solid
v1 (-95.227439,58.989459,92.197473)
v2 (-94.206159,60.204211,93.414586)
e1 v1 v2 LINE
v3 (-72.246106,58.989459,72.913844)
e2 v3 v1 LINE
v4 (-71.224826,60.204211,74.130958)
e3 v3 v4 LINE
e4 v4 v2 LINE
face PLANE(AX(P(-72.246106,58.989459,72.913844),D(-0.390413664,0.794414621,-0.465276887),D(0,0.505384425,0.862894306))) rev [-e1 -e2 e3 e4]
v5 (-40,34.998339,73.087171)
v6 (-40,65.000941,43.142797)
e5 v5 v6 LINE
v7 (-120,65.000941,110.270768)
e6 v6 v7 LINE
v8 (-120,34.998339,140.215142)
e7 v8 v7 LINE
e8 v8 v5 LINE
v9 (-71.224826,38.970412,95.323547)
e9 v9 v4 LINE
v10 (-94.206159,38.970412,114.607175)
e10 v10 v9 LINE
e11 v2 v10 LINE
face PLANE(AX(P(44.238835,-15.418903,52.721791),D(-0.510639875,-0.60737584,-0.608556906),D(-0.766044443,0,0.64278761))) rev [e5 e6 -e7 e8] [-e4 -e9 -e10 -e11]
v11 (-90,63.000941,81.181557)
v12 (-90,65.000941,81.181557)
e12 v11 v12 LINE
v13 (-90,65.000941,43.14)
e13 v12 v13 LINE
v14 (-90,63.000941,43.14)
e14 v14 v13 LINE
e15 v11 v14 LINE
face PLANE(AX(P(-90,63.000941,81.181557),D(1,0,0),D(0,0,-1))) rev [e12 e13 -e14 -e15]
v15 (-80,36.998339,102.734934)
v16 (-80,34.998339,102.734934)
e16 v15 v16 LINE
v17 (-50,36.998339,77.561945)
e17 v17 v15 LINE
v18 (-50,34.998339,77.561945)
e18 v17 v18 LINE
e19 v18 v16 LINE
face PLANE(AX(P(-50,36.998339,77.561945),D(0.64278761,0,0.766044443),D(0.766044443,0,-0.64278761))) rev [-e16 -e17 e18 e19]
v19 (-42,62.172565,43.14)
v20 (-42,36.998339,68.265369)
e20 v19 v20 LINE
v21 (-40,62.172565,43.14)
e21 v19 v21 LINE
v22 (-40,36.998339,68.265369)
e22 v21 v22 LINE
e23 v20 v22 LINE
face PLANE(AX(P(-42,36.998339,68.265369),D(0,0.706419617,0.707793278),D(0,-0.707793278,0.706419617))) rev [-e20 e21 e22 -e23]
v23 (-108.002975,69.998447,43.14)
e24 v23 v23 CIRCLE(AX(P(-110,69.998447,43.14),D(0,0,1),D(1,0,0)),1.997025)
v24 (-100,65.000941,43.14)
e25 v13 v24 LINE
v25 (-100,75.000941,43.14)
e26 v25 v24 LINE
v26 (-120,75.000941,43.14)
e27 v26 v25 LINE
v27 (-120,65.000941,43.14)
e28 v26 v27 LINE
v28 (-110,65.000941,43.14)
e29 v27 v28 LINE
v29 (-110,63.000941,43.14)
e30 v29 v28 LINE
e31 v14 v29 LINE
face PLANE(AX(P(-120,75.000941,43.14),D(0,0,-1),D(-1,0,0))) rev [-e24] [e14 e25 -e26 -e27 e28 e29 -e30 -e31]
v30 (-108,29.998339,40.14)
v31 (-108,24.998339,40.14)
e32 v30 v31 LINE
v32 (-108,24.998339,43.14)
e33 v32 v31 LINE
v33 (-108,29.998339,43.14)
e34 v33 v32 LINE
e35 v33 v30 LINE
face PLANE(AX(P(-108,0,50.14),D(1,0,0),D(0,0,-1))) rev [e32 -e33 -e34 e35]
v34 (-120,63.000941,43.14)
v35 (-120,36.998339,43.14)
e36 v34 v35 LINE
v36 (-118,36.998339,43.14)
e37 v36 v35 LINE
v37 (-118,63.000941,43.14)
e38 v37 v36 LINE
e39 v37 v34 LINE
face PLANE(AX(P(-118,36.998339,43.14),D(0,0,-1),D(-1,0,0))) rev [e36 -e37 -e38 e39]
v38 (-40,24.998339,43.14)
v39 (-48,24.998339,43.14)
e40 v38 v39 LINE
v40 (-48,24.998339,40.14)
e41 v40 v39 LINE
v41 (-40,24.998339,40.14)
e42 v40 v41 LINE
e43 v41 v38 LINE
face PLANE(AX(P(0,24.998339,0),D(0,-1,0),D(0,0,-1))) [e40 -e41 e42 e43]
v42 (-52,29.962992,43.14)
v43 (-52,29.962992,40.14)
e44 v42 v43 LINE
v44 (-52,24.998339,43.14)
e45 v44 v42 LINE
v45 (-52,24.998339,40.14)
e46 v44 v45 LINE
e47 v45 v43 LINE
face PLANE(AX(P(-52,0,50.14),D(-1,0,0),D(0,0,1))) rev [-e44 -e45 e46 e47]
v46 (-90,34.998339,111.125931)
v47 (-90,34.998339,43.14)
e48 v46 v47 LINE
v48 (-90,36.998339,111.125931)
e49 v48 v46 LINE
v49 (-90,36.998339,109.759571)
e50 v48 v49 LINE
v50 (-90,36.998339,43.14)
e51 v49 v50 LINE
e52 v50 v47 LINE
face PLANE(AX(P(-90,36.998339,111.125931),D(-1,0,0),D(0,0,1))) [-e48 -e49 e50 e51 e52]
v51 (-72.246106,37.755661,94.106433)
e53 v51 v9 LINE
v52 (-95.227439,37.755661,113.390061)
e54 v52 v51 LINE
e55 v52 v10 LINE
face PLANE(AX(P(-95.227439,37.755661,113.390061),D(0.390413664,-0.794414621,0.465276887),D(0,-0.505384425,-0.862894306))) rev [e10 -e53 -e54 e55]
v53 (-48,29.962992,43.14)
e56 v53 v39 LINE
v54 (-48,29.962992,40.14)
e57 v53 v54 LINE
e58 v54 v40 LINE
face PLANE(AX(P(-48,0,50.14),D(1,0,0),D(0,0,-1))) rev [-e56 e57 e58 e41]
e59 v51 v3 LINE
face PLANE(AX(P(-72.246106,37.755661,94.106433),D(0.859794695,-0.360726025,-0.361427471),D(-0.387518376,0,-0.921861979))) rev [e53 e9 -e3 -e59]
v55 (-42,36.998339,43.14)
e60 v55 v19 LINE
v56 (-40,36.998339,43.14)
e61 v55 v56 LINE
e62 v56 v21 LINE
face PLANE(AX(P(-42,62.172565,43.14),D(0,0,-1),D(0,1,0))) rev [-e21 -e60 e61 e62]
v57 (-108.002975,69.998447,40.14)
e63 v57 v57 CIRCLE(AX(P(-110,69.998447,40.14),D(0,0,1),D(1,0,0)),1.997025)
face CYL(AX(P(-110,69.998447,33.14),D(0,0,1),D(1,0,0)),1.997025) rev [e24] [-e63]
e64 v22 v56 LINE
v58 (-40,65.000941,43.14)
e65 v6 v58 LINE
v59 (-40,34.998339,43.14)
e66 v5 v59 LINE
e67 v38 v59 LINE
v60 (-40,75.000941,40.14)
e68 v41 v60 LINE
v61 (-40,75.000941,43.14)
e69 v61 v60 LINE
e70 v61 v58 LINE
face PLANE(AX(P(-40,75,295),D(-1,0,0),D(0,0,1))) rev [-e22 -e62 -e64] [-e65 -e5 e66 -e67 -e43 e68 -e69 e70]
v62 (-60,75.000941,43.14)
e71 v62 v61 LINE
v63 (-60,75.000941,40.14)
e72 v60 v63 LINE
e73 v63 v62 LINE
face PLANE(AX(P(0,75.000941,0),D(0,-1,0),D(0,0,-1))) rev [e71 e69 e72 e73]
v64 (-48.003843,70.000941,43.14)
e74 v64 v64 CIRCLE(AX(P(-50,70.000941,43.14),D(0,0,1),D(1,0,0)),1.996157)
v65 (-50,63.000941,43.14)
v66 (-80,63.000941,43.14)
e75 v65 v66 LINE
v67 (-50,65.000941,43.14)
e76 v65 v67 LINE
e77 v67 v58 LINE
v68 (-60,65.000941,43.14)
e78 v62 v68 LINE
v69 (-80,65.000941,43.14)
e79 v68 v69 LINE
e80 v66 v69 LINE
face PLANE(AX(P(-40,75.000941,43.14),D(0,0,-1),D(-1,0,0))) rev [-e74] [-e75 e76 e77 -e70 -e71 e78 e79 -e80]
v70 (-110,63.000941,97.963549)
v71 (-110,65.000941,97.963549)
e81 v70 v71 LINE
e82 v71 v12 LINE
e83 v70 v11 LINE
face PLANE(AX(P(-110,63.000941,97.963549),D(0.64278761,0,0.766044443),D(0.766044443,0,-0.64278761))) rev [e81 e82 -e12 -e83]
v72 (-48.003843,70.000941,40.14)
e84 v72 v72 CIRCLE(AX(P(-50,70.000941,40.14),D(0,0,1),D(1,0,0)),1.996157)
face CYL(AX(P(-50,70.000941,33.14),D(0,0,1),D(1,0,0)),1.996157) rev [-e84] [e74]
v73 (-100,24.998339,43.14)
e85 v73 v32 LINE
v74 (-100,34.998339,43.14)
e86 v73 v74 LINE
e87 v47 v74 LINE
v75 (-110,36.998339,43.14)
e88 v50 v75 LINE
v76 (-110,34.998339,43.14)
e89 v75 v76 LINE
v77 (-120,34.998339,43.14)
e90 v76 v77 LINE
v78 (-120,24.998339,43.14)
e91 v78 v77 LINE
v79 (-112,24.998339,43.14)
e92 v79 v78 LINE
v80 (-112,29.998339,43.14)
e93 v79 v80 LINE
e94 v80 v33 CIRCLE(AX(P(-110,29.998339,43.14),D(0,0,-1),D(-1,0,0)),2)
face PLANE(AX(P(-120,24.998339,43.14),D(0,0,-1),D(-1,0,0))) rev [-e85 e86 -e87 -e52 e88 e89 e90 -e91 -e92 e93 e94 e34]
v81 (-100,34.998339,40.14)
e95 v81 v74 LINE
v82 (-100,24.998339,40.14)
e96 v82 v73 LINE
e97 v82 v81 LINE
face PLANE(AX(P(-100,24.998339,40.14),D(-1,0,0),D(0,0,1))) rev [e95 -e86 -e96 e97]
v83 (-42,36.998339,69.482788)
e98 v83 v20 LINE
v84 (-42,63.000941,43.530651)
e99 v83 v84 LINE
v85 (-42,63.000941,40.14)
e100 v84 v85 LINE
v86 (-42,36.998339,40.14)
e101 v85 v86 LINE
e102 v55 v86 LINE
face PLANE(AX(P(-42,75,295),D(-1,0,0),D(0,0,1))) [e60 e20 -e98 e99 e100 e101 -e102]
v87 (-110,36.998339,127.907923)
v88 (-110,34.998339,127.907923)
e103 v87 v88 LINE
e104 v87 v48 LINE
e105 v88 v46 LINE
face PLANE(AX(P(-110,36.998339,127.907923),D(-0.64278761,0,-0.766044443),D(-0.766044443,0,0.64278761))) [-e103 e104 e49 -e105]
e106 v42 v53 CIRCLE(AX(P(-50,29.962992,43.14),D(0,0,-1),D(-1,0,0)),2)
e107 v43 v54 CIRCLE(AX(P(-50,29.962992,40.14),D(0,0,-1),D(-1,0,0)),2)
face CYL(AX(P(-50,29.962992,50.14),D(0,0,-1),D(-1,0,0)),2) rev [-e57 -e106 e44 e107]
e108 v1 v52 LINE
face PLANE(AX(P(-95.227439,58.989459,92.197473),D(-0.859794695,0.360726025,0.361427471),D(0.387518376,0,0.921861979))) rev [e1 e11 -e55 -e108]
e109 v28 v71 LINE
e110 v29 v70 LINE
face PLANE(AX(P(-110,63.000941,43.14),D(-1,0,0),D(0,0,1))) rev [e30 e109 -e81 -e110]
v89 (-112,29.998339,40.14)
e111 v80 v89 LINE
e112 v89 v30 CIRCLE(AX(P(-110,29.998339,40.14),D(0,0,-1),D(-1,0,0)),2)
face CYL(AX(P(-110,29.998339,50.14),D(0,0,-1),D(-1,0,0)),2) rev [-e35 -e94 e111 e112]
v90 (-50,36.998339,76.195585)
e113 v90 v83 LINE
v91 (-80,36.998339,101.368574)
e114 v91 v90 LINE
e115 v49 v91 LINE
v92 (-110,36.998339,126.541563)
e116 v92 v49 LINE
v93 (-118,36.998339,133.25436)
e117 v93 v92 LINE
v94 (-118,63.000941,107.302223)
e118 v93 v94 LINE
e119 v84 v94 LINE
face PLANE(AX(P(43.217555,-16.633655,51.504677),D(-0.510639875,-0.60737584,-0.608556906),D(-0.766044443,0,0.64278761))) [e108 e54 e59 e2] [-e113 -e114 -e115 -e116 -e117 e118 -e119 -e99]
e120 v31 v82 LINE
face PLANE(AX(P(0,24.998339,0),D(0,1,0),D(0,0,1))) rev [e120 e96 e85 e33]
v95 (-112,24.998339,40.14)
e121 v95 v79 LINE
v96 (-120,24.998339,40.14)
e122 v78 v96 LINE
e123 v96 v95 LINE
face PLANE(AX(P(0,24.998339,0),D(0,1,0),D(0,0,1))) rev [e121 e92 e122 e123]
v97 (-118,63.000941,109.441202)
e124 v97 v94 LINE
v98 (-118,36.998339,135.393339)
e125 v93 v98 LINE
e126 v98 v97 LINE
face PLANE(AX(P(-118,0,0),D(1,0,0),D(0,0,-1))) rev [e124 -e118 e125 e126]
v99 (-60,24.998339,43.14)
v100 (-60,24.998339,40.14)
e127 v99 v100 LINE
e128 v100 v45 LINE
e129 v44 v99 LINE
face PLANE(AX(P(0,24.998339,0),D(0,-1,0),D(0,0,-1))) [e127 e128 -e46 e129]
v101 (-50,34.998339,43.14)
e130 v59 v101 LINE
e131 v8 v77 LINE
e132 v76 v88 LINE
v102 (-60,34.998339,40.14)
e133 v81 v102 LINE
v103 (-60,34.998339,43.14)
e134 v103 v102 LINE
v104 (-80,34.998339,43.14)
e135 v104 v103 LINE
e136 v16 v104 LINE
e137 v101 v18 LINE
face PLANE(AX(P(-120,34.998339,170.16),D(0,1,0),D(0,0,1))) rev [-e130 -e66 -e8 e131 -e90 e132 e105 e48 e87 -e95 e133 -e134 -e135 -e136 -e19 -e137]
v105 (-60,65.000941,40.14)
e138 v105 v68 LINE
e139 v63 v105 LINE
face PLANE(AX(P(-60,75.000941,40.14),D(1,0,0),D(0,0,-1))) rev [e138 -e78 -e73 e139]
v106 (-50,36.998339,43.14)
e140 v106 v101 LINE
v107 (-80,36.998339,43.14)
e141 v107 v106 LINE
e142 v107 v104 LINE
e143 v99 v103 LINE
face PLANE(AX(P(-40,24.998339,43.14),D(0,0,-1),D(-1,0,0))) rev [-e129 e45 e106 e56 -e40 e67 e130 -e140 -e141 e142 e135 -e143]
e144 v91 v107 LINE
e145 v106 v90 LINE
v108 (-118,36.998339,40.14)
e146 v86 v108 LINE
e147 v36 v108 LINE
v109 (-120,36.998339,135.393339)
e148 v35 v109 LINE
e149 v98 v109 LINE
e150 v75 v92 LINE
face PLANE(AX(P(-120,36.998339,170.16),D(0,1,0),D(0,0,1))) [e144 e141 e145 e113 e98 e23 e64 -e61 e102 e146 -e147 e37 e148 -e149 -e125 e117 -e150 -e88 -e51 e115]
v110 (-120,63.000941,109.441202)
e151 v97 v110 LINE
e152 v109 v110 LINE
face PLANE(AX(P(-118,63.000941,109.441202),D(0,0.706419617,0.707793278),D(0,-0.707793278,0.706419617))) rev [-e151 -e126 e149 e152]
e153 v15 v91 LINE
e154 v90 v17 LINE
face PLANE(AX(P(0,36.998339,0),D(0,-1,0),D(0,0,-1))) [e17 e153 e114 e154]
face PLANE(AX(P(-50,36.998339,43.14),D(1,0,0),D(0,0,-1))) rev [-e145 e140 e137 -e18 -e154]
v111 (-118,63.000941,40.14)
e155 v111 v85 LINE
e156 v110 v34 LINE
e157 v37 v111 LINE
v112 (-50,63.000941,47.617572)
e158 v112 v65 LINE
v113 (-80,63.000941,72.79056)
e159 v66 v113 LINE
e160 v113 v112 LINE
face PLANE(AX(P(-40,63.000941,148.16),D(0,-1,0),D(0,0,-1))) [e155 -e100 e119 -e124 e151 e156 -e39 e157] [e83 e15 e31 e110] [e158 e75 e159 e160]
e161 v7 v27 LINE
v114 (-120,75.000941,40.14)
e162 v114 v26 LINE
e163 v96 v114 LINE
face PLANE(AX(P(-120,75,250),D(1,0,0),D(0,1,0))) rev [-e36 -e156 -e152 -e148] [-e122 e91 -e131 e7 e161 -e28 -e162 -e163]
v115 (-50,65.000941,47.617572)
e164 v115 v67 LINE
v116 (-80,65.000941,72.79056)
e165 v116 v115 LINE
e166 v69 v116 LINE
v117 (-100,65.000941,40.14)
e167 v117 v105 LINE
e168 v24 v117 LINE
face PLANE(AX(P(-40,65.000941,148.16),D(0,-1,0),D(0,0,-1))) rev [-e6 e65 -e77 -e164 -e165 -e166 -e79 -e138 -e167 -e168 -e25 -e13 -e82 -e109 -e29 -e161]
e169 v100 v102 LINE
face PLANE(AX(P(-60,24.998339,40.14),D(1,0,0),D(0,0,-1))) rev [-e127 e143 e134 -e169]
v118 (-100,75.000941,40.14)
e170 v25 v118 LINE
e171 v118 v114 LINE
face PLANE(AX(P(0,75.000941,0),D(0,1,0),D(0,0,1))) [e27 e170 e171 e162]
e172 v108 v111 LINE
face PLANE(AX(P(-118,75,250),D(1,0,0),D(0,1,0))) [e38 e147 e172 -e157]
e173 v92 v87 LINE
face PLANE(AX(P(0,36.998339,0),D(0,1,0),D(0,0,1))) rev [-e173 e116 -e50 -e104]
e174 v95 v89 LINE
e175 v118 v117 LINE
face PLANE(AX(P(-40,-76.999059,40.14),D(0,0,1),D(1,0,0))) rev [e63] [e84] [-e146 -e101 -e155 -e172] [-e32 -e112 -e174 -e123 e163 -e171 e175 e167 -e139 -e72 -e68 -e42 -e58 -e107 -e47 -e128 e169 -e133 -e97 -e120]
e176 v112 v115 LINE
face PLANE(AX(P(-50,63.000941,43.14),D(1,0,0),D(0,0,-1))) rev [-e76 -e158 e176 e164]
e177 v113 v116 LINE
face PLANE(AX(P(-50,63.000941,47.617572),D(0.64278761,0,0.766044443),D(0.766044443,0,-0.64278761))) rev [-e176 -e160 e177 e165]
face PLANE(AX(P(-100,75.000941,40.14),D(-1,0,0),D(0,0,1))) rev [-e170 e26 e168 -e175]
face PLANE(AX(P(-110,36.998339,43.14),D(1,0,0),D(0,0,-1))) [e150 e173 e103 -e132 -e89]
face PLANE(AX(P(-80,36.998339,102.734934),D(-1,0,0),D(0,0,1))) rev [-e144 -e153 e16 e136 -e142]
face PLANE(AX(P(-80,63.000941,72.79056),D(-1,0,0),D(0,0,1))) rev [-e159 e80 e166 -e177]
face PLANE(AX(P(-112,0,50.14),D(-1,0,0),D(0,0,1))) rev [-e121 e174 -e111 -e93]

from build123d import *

# Parameters (mm, degrees)
SKETCH_2_W           = 240
SKETCH_2_H           = 150
EXTRUDE_1_DEPTH      = 250
CUT_EXTRUDE_1_DEPTH  = 200
CUT_REVOLVE_1_ANGLE  = 37.4
SKETCH_13_W          = 80
SKETCH_13_H          = 100
CUT_EXTRUDE_2_DEPTH  = 295
SKETCH_14_W          = 160
SKETCH_14_H          = 150
CUT_EXTRUDE_3_DEPTH  = 295
SKETCH_16_W          = 80
SKETCH_16_H          = 28.16
CUT_EXTRUDE_4_DEPTH  = 295
SKETCH_22_W          = 80
SKETCH_22_H          = 9.999058643
CUT_EXTRUDE_5_DEPTH  = 120
SKETCH_23_W          = 80
SKETCH_23_H          = 9.99833939
CUT_EXTRUDE_6_DEPTH  = 142
SKETCH_24_W          = 80
SKETCH_24_H          = 11.98
CUT_EXTRUDE_7_DEPTH  = 142
SKETCH_25_W          = 20
SKETCH_25_H          = 3
EXTRUDE_2_DEPTH      = 10
SKETCH_26_W          = 20
SKETCH_26_H          = 3
EXTRUDE_3_DEPTH      = 10
SKETCH_27_W          = 20
SKETCH_27_H          = 3
EXTRUDE_4_DEPTH      = 10
SKETCH_28_W          = 20
SKETCH_28_H          = 3
EXTRUDE_5_DEPTH      = 10
SKETCH_29_R          = 1.997024656
CUT_EXTRUDE_8_DEPTH  = 10
SKETCH_30_R          = 1.996157305
CUT_EXTRUDE_9_DEPTH  = 10
CUT_EXTRUDE_10_DEPTH = 10
CUT_EXTRUDE_11_DEPTH = 10
SKETCH_34_W          = 76
SKETCH_34_H          = 26.002601967
CUT_EXTRUDE_14_DEPTH = 2
CUT_EXTRUDE_15_DEPTH = 2
CUT_EXTRUDE_17_DEPTH = 2
CUT_EXTRUDE_18_DEPTH = 2
CUT_EXTRUDE_20_DEPTH = 2
CUT_EXTRUDE_22_DEPTH = 2


with BuildPart() as part:
    # 草图2 → 凸台-拉伸1 (new body)
    with BuildSketch(Plane.XY):
        Rectangle(SKETCH_2_W, SKETCH_2_H)
    extrude(amount=EXTRUDE_1_DEPTH)

    # 草图9 → 切除-拉伸1 (cut)
    with BuildSketch(Plane(origin=(0, 75, 0), x_dir=(1, 0, 0), z_dir=(0, 1, 0))):
        Polygon((120, -250), (-120, -250), (208.236072982, 25.422767778), align=None)
    extrude(amount=-CUT_EXTRUDE_1_DEPTH, mode=Mode.SUBTRACT)

    # 草图10 → 切除-旋转1 (revolve, cut)
    with BuildSketch(Plane(origin=(73.519859787, 0, 87.617557028), x_dir=(0.7660444431189816, 0, -0.6427876096865353), z_dir=(0.6427876096865353, 0, 0.7660444431189817))):
        Polygon((60.675513844, -75), (-252.622235596, -75), (-252.622235596, 287.743692907), (60.675513844, 234.486341656), align=None)
    revolve(axis=Axis((120, -75, 48.616088517), (-0.7660444431189815, 0, 0.6427876096865353)), revolution_arc=CUT_REVOLVE_1_ANGLE, mode=Mode.SUBTRACT)

    # 草图13 → 切除-拉伸2 (cut)
    with BuildSketch(Plane(origin=(0, 0, 0), x_dir=(-1, 0, 0), z_dir=(0, 0, -1))):
        with Locations((80, -25)):
            Rectangle(SKETCH_13_W, SKETCH_13_H)
    extrude(amount=-CUT_EXTRUDE_2_DEPTH, mode=Mode.SUBTRACT)

    # 草图14 → 切除-拉伸3 (cut)
    with BuildSketch(Plane(origin=(0, 0, 0), x_dir=(-1, 0, 0), z_dir=(0, 0, -1))):
        with Locations((-40, 0)):
            Rectangle(SKETCH_14_W, SKETCH_14_H)
    extrude(amount=-CUT_EXTRUDE_3_DEPTH, mode=Mode.SUBTRACT)

    # 草图16 → 切除-拉伸4 (cut)
    with BuildSketch(Plane(origin=(0, 75, 0), x_dir=(1, 0, 0), z_dir=(0, 1, 0))):
        with Locations((-80, -14.08)):
            Rectangle(SKETCH_16_W, SKETCH_16_H)
    extrude(amount=-CUT_EXTRUDE_4_DEPTH, mode=Mode.SUBTRACT)

    # 草图22 → 切除-拉伸5 (cut)
    with BuildSketch(Plane(origin=(0, 0, 28.16), x_dir=(-1, 0, 0), z_dir=(0, 0, -1))):
        with Locations((80, 70.000470678)):
            Rectangle(SKETCH_22_W, SKETCH_22_H)
    extrude(amount=-CUT_EXTRUDE_5_DEPTH, mode=Mode.SUBTRACT)

    # 草图23 → 切除-拉伸6 (cut)
    with BuildSketch(Plane(origin=(0, 0, 28.16), x_dir=(-1, 0, 0), z_dir=(0, 0, -1))):
        with Locations((80, 29.999169695)):
            Rectangle(SKETCH_23_W, SKETCH_23_H)
    extrude(amount=-CUT_EXTRUDE_6_DEPTH, mode=Mode.SUBTRACT)

    # 草图24 → 切除-拉伸7 (cut)
    with BuildSketch(Plane(origin=(0, 65.000941357, 0), x_dir=(1, 0, 0), z_dir=(0, 1, 0))):
        with Locations((-80, -34.15)):
            Rectangle(SKETCH_24_W, SKETCH_24_H)
    extrude(amount=-CUT_EXTRUDE_7_DEPTH, mode=Mode.SUBTRACT)

    # 草图25 → 凸台-拉伸2 (add)
    with BuildSketch(Plane(origin=(0, 65.000941357, 0), x_dir=(1, 0, 0), z_dir=(0, 1, 0))):
        with Locations((-50, -41.64)):
            Rectangle(SKETCH_25_W, SKETCH_25_H)
    extrude(amount=EXTRUDE_2_DEPTH)

    # 草图26 → 凸台-拉伸3 (add)
    with BuildSketch(Plane(origin=(0, 65.000941357, 0), x_dir=(1, 0, 0), z_dir=(0, 1, 0))):
        with Locations((-110, -41.64)):
            Rectangle(SKETCH_26_W, SKETCH_26_H)
    extrude(amount=EXTRUDE_3_DEPTH)

    # 草图27 → 凸台-拉伸4 (add)
    with BuildSketch(Plane.XZ.offset(-34.99833939)):
        with Locations((-50, 41.64)):
            Rectangle(SKETCH_27_W, SKETCH_27_H)
    extrude(amount=EXTRUDE_4_DEPTH)

    # 草图28 → 凸台-拉伸5 (add)
    with BuildSketch(Plane.XZ.offset(-34.99833939)):
        with Locations((-110, 41.64)):
            Rectangle(SKETCH_28_W, SKETCH_28_H)
    extrude(amount=EXTRUDE_5_DEPTH)

    # 草图29 → 切除-拉伸8 (cut)
    with BuildSketch(Plane.XY.offset(43.14)):
        with Locations((-110, 69.998446832)):
            Circle(SKETCH_29_R)
    extrude(amount=-CUT_EXTRUDE_8_DEPTH, mode=Mode.SUBTRACT)

    # 草图30 → 切除-拉伸9 (cut)
    with BuildSketch(Plane.XY.offset(43.14)):
        with Locations((-50, 70.000941357)):
            Circle(SKETCH_30_R)
    extrude(amount=-CUT_EXTRUDE_9_DEPTH, mode=Mode.SUBTRACT)

    # 草图31 → 切除-拉伸10 (cut)
    with BuildSketch(Plane(origin=(0, 0, 40.14), x_dir=(-1, 0, 0), z_dir=(0, 0, -1))):
        with BuildLine():
            ThreePointArc((52, 29.962991919), (50, 31.962991919), (48, 29.962991919))
            Line((48, 29.962991919), (50, 29.962991919))
            Line((50, 29.962991919), (52, 29.962991919))
        make_face()
        with BuildLine():
            Line((48, 29.962991919), (48, 24.99833939))
            Line((48, 24.99833939), (50, 24.99833939))
            Line((50, 24.99833939), (50, 27.962991919))
            ThreePointArc((50, 27.962991919), (48.585786438, 28.548778357), (48, 29.962991919))
        make_face()
        with BuildLine():
            Line((50, 27.962991919), (50, 24.99833939))
            Line((50, 24.99833939), (52, 24.99833939))
            Line((52, 24.99833939), (52, 29.962991919))
            ThreePointArc((52, 29.962991919), (51.414213562, 28.548778357), (50, 27.962991919))
        make_face()
        with BuildLine():
            Line((50, 29.962991919), (48, 29.962991919))
            ThreePointArc((48, 29.962991919), (48.585786438, 28.548778357), (50, 27.962991919))
            Line((50, 27.962991919), (50, 29.962991919))
        make_face()
        with BuildLine():
            Line((50, 29.962991919), (50, 27.962991919))
            ThreePointArc((50, 27.962991919), (51.414213562, 28.548778357), (52, 29.962991919))
            Line((52, 29.962991919), (50, 29.962991919))
        make_face()
    extrude(amount=-CUT_EXTRUDE_10_DEPTH, mode=Mode.SUBTRACT)

    # 草图32 → 切除-拉伸11 (cut)
    with BuildSketch(Plane(origin=(0, 0, 40.14), x_dir=(-1, 0, 0), z_dir=(0, 0, -1))):
        with BuildLine():
            Line((112, 24.99833939), (112, 29.99833939))
            ThreePointArc((112, 29.99833939), (110, 31.99833939), (108, 29.99833939))
            Line((108, 29.99833939), (108, 24.99833939))
            Line((108, 24.99833939), (112, 24.99833939))
        make_face()
    extrude(amount=-CUT_EXTRUDE_11_DEPTH, mode=Mode.SUBTRACT)

    # 抽壳9: read off the stored shape, not the designer's step
    # 抽壳9: loft between two sections, ruled curve by curve
    shell_9_from = [
        Edge.make_line((-118, 36.99833939, 133.254360386), (-118, 36.99833939, 42.14)),
        Edge.make_line((-118, 36.99833939, 133.254360386), (-42, 36.99833939, 69.482788417)),
        Edge.make_line((-42, 36.99833939, 69.482788417), (-42, 36.99833939, 42.14)),
        Edge.make_line((-118, 36.99833939, 42.14), (-42, 36.99833939, 42.14)),
    ]
    shell_9_to = [
        Edge.make_line((-118, 63.000941357, 107.302223356), (-118, 63.000941357, 42.14)),
        Edge.make_line((-118, 63.000941357, 107.302223356), (-42, 63.000941357, 43.530651387)),
        Edge.make_line((-42, 63.000941357, 43.530651387), (-42, 63.000941357, 42.14)),
        Edge.make_line((-118, 63.000941357, 42.14), (-42, 63.000941357, 42.14)),
    ]
    shell_9 = Solid(Shell([*[Face.make_surface_from_curves(shell_9_from[k], shell_9_to[k]) for k in range(4)], Face(Wire(shell_9_from)), Face(Wire(shell_9_to))]))
    add(shell_9, mode=Mode.SUBTRACT)

    # 草图34 → 切除-拉伸14 (cut)
    with BuildSketch(Plane(origin=(0, 0, 40.14), x_dir=(-1, 0, 0), z_dir=(0, 0, -1))):
        with Locations((80, 49.999640374)):
            Rectangle(SKETCH_34_W, SKETCH_34_H)
    extrude(amount=-CUT_EXTRUDE_14_DEPTH, mode=Mode.SUBTRACT)

    # 草图35 → 切除-拉伸15 (cut)
    with BuildSketch(Plane.ZY.offset(120)):
        Polygon((43.14, 63.000941357), (109.441202222, 63.000941357), (135.393339252, 36.99833939), (43.14, 36.99833939), align=None)
    extrude(amount=-CUT_EXTRUDE_15_DEPTH, mode=Mode.SUBTRACT)

    # 草图37 → 切除-拉伸17 (cut)
    with BuildSketch(Plane(origin=(-40, 0, 0), x_dir=(0, 0, -1), z_dir=(1, 0, 0))):
        Polygon((-43.14, 36.99833939), (-68.265368758, 36.99833939), (-43.14, 62.172565402), align=None)
    extrude(amount=-CUT_EXTRUDE_17_DEPTH, mode=Mode.SUBTRACT)

    # 草图38 → 切除-拉伸18 (cut)
    with BuildSketch(Plane.XZ.offset(-34.99833939)):
        Polygon((-110, 43.14), (-110, 127.907923344), (-90, 111.12593072), (-90, 43.14), align=None)
        Polygon((-50, 43.14), (-50, 77.561945473), (-80, 102.734934409), (-80, 43.14), align=None)
    extrude(amount=-CUT_EXTRUDE_18_DEPTH, mode=Mode.SUBTRACT)

    # 草图39 → 切除-拉伸20 (cut)
    with BuildSketch(Plane(origin=(0, 65.000941357, 0), x_dir=(1, 0, 0), z_dir=(0, 1, 0))):
        Polygon((-110, -43.14), (-110, -97.963549373), (-90, -81.18155675), (-90, -43.14), align=None)
        Polygon((-50, -43.14), (-50, -47.617571503), (-80, -72.790560438), (-80, -43.14), align=None)
    extrude(amount=-CUT_EXTRUDE_20_DEPTH, mode=Mode.SUBTRACT)

    # 草图40 → 切除-拉伸22 (cut)
    with BuildSketch(Plane(origin=(23.136711502, 27.51974584, 27.573259053), x_dir=(0.8597946952762991, -0.3607260251766269, -0.3614274709191423), z_dir=(0.5106398750339969, 0.6073758397232878, 0.6085569055936306))):
        Polygon((-109.748917815, -9.755427356), (-136.477779275, -23.377760676), (-136.477779275, -53.377760676), (-109.748917815, -39.755427356), align=None)
    extrude(amount=-CUT_EXTRUDE_22_DEPTH, mode=Mode.SUBTRACT)


solid = part.part
